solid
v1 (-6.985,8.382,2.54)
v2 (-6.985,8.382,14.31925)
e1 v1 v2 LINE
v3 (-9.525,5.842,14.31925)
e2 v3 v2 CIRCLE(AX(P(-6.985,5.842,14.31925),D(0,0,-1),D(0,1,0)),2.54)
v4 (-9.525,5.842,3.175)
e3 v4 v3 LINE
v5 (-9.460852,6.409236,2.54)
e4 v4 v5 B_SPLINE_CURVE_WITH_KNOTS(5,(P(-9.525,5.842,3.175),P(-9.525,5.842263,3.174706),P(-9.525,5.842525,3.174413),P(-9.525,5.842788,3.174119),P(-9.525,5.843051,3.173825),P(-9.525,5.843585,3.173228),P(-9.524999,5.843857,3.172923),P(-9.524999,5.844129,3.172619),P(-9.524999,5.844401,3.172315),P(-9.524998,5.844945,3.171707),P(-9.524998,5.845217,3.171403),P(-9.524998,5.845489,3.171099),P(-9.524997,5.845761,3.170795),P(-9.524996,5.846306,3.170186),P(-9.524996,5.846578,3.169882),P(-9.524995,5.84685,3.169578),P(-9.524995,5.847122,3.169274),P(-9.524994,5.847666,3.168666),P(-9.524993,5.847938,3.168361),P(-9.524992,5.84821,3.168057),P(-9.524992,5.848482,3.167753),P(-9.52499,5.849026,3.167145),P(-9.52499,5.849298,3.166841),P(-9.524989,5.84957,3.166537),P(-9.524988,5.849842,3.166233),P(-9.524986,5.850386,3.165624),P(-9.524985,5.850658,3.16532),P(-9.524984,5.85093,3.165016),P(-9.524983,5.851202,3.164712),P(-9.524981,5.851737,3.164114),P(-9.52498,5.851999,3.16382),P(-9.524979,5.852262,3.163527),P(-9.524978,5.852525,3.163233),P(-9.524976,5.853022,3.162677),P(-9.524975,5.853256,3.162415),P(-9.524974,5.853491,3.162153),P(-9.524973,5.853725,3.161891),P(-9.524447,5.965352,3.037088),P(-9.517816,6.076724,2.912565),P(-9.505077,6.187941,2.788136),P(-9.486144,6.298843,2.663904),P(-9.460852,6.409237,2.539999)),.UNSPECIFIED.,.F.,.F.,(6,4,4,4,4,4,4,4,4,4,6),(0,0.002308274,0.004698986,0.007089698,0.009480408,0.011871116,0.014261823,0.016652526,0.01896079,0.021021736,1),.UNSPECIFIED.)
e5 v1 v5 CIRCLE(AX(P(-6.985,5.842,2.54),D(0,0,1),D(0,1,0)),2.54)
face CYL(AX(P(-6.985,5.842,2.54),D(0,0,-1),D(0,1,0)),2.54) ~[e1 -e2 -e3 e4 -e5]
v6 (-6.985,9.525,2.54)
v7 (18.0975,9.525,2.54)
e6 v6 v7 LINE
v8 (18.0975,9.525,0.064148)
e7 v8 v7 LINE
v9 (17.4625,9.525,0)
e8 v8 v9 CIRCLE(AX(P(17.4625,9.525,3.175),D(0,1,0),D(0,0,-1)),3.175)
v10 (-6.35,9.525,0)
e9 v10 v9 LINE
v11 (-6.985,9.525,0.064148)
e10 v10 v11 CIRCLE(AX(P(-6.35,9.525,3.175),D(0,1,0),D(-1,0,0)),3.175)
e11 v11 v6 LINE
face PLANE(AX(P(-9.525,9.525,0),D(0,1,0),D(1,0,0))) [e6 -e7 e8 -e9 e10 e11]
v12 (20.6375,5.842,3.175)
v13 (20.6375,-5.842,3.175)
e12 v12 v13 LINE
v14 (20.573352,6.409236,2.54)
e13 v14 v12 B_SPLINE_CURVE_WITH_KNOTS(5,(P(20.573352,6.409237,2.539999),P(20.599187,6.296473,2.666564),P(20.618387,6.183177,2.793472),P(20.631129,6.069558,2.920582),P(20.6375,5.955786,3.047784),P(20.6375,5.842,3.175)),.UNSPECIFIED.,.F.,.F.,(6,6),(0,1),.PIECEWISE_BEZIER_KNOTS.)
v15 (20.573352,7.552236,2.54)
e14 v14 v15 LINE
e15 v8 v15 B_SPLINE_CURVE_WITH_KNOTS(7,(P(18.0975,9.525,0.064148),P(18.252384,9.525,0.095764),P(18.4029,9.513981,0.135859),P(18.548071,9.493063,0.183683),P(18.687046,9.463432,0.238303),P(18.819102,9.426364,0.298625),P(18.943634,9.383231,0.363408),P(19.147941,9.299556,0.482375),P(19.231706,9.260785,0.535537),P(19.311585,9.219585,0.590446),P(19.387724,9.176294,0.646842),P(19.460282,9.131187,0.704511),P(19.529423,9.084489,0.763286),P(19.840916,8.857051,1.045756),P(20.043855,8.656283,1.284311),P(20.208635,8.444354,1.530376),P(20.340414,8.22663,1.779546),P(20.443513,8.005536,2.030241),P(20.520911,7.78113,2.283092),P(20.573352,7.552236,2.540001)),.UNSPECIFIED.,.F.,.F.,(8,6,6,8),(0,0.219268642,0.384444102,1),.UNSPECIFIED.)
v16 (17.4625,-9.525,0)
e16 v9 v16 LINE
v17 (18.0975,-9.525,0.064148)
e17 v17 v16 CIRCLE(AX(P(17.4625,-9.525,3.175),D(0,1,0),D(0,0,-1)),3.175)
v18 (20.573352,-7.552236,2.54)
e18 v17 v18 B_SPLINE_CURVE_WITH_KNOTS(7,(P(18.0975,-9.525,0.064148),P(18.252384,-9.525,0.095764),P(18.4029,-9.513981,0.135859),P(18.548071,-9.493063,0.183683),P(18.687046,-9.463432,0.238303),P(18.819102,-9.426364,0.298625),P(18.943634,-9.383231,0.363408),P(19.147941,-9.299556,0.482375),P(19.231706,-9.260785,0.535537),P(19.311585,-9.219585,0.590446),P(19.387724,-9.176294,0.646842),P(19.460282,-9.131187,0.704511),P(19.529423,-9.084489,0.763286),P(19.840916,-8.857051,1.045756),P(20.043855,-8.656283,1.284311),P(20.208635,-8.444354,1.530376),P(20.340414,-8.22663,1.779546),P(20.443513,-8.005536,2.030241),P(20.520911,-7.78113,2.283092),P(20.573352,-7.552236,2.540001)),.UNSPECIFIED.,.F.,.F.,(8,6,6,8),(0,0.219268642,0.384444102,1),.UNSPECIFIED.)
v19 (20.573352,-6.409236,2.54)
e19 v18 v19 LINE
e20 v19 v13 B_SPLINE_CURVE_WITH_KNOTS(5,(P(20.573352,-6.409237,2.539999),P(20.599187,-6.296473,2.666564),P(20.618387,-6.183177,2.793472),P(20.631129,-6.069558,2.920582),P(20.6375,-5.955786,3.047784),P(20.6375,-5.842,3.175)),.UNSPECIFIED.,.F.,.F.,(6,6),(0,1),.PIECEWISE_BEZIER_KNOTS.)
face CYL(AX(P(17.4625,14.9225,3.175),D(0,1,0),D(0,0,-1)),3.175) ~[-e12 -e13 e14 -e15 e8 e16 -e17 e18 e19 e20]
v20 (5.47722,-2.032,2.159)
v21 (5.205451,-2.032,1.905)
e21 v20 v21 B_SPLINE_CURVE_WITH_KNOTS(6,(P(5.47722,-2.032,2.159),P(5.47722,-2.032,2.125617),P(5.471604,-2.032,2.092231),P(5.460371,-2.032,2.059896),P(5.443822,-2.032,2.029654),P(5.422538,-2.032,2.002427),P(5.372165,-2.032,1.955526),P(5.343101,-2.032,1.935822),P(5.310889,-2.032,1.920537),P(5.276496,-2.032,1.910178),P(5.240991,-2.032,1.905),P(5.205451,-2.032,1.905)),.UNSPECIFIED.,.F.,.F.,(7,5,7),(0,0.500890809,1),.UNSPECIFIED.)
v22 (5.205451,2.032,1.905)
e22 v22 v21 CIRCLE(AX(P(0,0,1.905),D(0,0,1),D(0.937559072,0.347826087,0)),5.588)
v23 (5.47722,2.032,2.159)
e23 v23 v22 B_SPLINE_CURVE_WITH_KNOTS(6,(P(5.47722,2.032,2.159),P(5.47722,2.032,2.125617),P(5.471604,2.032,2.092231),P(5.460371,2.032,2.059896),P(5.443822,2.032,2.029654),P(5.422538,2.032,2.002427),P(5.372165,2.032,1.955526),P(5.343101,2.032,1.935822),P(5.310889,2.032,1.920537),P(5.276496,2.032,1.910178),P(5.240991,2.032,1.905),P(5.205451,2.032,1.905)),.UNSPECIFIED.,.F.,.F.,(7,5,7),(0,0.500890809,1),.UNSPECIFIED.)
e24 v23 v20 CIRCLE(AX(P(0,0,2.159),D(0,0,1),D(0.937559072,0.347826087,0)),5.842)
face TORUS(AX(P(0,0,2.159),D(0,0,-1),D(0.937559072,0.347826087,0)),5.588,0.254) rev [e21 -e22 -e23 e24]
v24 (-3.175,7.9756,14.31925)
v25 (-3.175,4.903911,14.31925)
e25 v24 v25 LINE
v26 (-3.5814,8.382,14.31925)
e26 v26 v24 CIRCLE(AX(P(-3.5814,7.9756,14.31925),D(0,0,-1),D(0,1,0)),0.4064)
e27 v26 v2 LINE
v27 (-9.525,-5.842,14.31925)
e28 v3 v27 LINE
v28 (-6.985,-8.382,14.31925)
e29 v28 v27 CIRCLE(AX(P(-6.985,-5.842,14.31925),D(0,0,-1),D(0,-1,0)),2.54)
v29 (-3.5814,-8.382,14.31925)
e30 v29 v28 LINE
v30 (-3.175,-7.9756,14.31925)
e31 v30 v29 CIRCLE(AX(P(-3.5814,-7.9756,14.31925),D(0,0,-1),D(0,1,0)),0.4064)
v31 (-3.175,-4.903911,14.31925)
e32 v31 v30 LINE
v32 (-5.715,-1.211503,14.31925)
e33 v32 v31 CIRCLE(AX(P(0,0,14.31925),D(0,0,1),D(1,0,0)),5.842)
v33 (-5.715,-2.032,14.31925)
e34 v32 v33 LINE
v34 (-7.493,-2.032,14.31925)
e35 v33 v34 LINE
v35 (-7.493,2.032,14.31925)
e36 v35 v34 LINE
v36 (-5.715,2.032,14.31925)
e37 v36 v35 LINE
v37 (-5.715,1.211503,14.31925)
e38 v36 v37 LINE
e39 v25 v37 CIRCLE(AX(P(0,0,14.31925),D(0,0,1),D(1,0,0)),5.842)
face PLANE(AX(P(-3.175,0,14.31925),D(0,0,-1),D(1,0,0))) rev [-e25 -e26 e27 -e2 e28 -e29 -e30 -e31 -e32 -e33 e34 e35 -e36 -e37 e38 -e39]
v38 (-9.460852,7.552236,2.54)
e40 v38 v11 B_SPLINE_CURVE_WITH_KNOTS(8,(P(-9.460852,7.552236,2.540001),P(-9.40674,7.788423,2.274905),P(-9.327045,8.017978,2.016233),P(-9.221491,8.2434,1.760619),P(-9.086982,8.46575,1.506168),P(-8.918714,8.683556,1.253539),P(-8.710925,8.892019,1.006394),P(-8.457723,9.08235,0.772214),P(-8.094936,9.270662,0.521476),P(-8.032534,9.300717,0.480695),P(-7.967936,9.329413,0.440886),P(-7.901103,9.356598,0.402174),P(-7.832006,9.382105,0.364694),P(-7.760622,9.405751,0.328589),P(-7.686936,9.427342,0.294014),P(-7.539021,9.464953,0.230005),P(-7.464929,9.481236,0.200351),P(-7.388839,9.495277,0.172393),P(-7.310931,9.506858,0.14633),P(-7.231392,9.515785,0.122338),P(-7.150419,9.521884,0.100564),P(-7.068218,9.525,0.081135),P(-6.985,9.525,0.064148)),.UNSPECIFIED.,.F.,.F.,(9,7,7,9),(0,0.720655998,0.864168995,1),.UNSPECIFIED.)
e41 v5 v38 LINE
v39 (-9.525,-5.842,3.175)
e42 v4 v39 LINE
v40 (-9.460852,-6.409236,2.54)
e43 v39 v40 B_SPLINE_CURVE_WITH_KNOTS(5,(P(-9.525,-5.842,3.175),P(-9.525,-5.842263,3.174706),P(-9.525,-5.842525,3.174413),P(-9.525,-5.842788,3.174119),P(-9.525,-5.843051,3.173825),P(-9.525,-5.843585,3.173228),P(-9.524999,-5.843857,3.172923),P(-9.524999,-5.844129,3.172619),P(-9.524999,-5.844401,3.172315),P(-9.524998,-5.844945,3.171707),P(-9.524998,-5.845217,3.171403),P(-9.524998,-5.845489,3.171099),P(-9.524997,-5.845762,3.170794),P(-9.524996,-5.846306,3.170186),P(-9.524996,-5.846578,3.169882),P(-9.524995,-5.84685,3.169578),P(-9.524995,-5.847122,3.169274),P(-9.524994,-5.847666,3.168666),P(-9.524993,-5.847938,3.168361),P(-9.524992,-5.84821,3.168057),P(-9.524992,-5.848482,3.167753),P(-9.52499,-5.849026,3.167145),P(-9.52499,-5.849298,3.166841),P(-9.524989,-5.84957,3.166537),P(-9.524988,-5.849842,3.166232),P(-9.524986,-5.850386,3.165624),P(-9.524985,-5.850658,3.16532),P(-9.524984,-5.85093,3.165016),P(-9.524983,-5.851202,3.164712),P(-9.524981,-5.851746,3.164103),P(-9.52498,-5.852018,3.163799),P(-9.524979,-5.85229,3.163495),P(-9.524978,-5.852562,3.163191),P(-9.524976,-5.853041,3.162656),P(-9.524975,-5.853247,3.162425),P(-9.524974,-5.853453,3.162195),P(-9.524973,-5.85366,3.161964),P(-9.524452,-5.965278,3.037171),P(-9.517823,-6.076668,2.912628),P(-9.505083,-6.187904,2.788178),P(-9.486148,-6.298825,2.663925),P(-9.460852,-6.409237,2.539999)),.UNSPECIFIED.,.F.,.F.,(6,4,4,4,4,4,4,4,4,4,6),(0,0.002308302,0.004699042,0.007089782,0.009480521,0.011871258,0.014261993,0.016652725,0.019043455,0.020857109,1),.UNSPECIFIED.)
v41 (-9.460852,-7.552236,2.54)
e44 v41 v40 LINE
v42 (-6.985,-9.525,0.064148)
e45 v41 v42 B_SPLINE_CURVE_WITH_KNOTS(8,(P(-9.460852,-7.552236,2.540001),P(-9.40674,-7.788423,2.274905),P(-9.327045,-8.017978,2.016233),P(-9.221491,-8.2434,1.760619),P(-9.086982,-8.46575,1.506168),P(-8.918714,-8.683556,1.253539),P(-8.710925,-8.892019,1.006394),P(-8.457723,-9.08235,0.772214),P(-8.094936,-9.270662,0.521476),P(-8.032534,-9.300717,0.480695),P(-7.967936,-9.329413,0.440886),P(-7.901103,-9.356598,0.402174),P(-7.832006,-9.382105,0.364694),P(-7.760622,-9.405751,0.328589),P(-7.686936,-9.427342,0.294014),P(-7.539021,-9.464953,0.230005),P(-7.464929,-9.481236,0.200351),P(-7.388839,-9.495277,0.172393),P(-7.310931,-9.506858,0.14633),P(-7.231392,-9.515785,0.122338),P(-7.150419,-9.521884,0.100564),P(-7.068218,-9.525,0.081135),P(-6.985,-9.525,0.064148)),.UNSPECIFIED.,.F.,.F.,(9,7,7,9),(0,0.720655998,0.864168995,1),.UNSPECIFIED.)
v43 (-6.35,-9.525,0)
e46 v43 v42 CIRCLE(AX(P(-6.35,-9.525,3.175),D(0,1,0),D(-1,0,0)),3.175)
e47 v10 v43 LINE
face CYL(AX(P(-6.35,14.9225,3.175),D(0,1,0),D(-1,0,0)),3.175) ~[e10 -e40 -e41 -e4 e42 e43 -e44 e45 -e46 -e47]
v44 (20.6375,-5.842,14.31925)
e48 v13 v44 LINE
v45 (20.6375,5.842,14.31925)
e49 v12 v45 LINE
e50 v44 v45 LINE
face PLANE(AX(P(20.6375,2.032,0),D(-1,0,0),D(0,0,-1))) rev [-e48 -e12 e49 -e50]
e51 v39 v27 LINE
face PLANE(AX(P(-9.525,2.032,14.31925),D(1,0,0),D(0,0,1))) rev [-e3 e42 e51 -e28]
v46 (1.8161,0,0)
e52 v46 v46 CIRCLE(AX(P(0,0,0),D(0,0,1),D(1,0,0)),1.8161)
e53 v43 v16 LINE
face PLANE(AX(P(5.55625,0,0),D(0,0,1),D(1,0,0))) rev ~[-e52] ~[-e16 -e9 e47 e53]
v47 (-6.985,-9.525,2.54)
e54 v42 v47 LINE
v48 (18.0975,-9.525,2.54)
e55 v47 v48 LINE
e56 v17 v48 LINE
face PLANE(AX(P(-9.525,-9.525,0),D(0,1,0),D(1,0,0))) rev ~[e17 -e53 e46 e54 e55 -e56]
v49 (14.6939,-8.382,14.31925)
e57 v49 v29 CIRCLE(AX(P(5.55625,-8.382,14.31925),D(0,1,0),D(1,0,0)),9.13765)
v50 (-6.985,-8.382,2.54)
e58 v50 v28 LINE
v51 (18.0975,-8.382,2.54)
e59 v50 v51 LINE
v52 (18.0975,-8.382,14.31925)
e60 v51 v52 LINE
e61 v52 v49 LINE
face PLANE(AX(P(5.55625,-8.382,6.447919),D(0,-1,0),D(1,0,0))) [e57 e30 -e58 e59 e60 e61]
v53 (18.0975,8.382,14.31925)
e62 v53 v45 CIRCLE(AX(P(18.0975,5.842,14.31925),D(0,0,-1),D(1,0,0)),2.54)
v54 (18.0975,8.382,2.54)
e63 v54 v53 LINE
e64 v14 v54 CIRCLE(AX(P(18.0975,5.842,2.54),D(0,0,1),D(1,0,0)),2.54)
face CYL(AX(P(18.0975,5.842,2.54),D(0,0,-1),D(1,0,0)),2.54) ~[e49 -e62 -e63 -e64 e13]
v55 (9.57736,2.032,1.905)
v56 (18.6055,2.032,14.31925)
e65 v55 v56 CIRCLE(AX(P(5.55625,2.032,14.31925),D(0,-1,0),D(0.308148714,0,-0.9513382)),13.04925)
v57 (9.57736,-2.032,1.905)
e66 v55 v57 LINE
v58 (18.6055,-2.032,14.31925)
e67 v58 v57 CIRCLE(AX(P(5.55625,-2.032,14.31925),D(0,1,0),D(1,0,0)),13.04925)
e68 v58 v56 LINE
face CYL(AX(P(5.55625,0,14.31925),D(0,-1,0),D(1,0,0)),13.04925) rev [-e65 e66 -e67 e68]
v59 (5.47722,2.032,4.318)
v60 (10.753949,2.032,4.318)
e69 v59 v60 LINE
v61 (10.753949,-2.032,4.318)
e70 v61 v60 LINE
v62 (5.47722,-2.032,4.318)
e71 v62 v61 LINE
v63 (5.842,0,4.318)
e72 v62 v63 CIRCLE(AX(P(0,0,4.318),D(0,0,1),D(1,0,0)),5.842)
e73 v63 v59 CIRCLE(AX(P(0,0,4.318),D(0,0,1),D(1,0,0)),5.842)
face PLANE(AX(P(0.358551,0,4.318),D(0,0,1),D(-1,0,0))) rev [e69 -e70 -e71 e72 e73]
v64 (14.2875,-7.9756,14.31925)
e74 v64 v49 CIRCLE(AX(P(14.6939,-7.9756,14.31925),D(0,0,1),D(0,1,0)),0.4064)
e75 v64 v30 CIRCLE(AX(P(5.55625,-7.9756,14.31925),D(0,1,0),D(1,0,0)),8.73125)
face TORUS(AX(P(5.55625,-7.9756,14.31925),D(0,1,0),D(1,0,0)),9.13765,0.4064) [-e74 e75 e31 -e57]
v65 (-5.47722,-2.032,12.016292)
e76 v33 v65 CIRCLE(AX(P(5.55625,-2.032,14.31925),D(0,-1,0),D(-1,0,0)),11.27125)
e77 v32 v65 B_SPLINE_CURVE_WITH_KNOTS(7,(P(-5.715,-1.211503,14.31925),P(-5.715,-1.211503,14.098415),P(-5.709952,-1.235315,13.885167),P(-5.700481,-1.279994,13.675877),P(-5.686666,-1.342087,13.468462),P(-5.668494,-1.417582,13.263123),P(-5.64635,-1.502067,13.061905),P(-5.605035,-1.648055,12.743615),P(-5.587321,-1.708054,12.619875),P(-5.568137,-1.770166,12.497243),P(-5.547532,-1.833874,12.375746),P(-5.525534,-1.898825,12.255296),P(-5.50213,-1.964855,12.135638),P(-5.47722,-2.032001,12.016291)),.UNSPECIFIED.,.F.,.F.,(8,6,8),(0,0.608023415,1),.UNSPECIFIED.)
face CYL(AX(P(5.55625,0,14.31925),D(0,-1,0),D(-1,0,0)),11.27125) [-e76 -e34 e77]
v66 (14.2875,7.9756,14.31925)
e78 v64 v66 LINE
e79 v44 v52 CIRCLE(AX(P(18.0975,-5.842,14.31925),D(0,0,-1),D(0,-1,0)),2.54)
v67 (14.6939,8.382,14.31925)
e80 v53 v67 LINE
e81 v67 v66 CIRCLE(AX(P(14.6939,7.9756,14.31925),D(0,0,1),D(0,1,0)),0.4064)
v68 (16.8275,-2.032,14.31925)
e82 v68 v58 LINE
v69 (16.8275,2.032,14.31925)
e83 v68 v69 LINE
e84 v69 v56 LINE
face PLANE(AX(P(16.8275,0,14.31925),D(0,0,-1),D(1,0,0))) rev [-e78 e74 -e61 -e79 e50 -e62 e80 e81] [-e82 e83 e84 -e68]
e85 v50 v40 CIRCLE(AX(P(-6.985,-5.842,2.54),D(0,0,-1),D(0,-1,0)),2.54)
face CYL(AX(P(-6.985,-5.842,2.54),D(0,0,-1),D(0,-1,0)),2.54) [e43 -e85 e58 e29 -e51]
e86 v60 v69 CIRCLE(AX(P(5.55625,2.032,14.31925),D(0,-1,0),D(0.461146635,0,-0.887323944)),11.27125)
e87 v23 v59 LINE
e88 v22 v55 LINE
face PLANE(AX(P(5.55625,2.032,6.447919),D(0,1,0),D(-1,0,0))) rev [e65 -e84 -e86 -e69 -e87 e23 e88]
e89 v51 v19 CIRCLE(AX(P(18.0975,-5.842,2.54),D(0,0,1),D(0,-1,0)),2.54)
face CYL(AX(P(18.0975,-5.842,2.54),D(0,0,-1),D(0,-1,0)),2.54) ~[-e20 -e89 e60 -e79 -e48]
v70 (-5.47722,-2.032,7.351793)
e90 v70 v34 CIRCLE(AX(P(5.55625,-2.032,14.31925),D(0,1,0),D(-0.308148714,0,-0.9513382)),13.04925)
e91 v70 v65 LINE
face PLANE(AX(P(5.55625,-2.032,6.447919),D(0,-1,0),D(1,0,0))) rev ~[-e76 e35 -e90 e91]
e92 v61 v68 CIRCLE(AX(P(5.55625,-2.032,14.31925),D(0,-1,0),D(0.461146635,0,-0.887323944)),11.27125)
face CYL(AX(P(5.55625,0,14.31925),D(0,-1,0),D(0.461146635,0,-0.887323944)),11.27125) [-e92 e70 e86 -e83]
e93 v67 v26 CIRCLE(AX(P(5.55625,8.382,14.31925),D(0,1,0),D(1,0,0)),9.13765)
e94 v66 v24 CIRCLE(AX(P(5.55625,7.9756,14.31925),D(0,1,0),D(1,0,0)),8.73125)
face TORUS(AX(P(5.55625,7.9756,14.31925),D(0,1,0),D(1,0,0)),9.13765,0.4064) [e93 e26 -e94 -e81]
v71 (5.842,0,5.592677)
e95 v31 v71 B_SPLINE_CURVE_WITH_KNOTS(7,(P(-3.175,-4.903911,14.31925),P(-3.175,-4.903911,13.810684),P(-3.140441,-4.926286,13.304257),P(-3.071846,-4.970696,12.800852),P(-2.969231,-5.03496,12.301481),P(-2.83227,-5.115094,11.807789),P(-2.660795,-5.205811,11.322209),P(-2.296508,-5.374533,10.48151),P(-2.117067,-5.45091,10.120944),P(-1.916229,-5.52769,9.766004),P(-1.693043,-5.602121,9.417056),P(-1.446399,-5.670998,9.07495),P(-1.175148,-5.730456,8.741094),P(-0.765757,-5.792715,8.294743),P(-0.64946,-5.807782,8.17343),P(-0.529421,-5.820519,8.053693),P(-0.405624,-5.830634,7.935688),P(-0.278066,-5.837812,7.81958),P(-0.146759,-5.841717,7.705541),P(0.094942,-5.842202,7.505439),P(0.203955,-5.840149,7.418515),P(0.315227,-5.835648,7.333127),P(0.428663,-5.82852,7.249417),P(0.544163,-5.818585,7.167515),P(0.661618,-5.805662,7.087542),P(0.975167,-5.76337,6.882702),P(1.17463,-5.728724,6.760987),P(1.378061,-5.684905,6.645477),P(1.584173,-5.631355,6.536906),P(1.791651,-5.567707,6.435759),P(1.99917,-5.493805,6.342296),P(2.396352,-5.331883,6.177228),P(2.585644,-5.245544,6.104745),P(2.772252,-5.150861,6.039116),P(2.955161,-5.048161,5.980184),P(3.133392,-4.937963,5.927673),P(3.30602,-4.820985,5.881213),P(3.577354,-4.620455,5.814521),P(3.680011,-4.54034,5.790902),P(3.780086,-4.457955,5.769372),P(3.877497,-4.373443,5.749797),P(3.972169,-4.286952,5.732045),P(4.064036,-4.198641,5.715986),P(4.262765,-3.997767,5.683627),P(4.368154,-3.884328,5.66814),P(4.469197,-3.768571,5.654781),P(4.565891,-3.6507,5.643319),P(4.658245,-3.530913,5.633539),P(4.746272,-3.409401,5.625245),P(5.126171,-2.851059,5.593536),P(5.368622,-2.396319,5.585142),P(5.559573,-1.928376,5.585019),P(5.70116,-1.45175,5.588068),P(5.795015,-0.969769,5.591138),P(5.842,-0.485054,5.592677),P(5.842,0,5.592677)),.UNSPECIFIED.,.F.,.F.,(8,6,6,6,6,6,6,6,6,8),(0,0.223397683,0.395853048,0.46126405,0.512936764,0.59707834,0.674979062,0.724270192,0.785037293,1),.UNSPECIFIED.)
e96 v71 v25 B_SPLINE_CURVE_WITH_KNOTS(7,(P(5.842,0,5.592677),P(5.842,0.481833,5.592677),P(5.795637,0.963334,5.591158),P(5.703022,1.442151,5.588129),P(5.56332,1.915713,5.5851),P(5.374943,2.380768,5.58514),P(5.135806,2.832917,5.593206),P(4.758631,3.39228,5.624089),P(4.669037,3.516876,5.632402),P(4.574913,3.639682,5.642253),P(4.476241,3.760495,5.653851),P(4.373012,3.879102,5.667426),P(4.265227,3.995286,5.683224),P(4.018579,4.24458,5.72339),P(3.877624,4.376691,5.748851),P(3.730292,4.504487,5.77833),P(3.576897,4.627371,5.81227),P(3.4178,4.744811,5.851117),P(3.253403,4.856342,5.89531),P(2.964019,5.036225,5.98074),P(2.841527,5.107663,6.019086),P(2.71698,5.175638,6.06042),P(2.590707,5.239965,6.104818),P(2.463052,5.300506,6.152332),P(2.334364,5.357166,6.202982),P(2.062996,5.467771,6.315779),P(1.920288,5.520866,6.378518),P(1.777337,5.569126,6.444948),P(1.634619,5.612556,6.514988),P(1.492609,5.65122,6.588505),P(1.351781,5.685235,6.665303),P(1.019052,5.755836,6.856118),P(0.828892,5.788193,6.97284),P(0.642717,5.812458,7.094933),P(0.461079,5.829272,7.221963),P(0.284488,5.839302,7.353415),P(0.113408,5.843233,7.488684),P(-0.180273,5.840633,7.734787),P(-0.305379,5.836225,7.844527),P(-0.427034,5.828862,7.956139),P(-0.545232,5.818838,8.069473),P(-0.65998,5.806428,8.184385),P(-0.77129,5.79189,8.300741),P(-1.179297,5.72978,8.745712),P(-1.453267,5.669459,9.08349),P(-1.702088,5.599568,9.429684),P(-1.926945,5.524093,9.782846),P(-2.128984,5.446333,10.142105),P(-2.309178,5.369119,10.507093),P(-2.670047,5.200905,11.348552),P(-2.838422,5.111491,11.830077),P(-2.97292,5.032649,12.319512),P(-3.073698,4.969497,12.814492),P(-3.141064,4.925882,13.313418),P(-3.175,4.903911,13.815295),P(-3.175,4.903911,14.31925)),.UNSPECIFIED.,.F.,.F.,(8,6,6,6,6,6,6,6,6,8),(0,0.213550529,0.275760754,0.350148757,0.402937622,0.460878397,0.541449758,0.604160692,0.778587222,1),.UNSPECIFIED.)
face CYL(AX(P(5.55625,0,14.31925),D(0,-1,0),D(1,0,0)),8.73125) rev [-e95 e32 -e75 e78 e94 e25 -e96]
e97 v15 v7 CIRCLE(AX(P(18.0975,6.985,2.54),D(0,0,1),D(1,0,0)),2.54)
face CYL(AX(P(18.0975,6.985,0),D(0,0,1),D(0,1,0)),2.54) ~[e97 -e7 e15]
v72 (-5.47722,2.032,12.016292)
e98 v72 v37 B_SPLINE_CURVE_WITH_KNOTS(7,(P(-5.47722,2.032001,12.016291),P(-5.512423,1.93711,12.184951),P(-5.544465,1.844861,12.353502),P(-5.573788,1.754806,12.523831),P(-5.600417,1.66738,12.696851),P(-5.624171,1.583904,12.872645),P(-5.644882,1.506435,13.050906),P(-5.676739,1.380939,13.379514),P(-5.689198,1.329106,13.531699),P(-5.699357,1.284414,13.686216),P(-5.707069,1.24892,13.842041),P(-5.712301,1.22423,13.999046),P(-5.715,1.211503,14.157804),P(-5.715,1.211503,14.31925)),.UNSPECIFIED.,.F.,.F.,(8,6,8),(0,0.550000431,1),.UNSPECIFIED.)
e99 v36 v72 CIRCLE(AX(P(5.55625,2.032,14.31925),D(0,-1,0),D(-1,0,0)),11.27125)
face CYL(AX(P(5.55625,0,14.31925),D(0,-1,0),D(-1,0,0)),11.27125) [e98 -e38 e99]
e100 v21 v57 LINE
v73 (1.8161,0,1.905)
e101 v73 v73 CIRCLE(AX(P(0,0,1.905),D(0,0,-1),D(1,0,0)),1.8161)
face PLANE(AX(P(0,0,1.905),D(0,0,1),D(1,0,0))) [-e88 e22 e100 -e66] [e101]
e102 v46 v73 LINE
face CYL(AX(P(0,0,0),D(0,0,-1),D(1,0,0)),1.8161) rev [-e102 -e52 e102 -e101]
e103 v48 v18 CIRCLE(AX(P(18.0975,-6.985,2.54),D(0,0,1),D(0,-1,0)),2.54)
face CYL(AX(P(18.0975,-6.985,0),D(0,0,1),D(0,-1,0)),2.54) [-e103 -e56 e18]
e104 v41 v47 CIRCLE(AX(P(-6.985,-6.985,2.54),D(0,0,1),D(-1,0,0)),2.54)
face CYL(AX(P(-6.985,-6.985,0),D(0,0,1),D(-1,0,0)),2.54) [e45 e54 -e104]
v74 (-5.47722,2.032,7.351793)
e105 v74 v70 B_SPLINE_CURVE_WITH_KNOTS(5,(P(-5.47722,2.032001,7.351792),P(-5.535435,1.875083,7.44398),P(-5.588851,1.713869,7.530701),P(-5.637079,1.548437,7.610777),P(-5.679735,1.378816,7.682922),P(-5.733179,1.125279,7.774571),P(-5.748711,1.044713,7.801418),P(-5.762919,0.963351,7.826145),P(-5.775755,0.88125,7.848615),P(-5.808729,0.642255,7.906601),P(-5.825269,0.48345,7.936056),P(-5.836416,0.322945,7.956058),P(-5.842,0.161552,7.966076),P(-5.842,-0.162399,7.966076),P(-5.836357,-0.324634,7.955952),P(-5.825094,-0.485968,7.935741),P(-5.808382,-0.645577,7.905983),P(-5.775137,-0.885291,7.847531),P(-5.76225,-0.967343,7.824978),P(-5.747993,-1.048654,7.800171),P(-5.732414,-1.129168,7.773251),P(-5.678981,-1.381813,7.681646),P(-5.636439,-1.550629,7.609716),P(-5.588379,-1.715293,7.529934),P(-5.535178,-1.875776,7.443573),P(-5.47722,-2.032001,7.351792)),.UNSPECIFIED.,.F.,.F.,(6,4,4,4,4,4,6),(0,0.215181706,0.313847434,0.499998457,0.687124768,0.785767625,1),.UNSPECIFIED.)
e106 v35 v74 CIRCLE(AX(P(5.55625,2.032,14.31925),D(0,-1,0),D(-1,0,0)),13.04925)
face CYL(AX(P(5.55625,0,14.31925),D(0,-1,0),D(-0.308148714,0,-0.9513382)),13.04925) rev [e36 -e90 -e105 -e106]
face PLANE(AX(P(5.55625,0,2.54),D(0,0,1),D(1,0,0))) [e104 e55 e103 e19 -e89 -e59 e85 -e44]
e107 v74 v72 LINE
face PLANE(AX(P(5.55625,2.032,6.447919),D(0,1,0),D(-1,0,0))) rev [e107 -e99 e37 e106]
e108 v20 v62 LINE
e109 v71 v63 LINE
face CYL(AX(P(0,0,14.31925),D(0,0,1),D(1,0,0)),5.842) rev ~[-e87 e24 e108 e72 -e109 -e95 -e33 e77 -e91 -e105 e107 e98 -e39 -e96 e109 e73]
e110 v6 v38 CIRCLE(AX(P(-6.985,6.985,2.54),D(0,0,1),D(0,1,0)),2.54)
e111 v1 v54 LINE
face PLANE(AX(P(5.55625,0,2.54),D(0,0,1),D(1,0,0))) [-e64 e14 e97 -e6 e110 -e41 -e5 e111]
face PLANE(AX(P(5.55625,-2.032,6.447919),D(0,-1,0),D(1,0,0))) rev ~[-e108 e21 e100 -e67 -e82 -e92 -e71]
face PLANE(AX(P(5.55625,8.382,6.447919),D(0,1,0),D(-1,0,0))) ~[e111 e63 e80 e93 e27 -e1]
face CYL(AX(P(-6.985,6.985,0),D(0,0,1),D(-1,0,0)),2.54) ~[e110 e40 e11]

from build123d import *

# Parameters (mm, degrees)
F2_W         = 30.1625
F2_H         = 19.05
F2_R         = 5.842
F2_R_2       = 1.8161
F3_DEPTH     = 2.54
F5_DEPTH     = 2.032
F7_DEPTH     = 6.35
F8_DEPTH     = 2.032
F9_DEPTH     = 2.032
F11_DEPTH    = 14.32025
F12_R        = 5.842
F13_DEPTH    = 12.41425
F14_R        = 2.54
F15_R        = 0.4064
F16_R        = 0.254
F17_T1_DEPTH = 18.2149387894
F18_T1_DEPTH = 29.845


# Not quite as in the source:
# - a fillet or chamfer that OpenCascade refuses, or shapes differently, is made with other operations: its cross-section is extruded or revolved along the edge and cut away or added


with BuildPart() as f3:
    # F2 (on Top) → F3 (new body)
    with BuildSketch(Plane.XY):
        with Locations((5.55625, 0)):
            Rectangle(F2_W, F2_H)
        Circle(F2_R, mode=Mode.SUBTRACT)
        Circle(F2_R)
        Circle(F2_R_2, mode=Mode.SUBTRACT)
    extrude(amount=F3_DEPTH)

    # F4 (on Front) → F5 (join, symmetric)
    with BuildSketch(Plane.XZ):
        with BuildLine():
            ThreePointArc((1.5351403895, 1.905), (-4.9973131459, 6.6442757011), (-7.493, 14.31925))
            Line((-7.493, 14.31925), (-9.525, 14.31925))
            Line((-9.525, 14.31925), (-9.525, 0))
            Line((-9.525, 0), (20.6375, 0))
            Line((20.6375, 0), (20.6375, 14.31925))
            Line((20.6375, 14.31925), (18.6055, 14.31925))
            ThreePointArc((18.6055, 14.31925), (16.1098131459, 6.6442757011), (9.5773596105, 1.905))
            Line((9.5773596105, 1.905), (1.5351403895, 1.905))
        make_face()
    extrude(amount=F5_DEPTH, both=True)

    # F6 (on face) → F7 (join)
    with BuildSketch(Plane.XZ.offset(2.032)):
        with BuildLine():
            Line((-3.175, 14.31925), (-9.525, 14.31925))
            Line((-9.525, 14.31925), (-9.525, 0))
            Line((-9.525, 0), (20.6375, 0))
            Line((20.6375, 0), (20.6375, 14.31925))
            Line((20.6375, 14.31925), (14.2875, 14.31925))
            ThreePointArc((14.2875, 14.31925), (5.55625, 5.588), (-3.175, 14.31925))
        make_face()
    extrude(amount=F7_DEPTH)

    # F4 (on Front) → F8 (cut, symmetric)
    with BuildSketch(Plane.XZ):
        with BuildLine():
            ThreePointArc((0.3585509899, 4.318), (-4.0776910817, 8.4687580722), (-5.715, 14.31925))
            Line((-5.715, 14.31925), (-7.493, 14.31925))
            ThreePointArc((-7.493, 14.31925), (-4.9973131459, 6.6442757011), (1.5351403895, 1.905))
            Line((1.5351403895, 1.905), (9.5773596105, 1.905))
            ThreePointArc((9.5773596105, 1.905), (16.1098131459, 6.6442757011), (18.6055, 14.31925))
            Line((18.6055, 14.31925), (16.8275, 14.31925))
            ThreePointArc((16.8275, 14.31925), (15.1901910817, 8.4687580722), (10.7539490101, 4.318))
            Line((10.7539490101, 4.318), (0.3585509899, 4.318))
        make_face()
    extrude(amount=F8_DEPTH, both=True, mode=Mode.SUBTRACT)

    # F4 (on Front) → F9 (join, through all)
    with BuildSketch(Plane.XZ):
        with BuildLine():
            ThreePointArc((14.2875, 14.31925), (5.55625, 5.588), (-3.175, 14.31925))
            Line((-3.175, 14.31925), (-5.715, 14.31925))
            ThreePointArc((-5.715, 14.31925), (-4.0776910817, 8.4687580722), (0.3585509899, 4.318))
            Line((0.3585509899, 4.318), (10.7539490101, 4.318))
            ThreePointArc((10.7539490101, 4.318), (15.1901910817, 8.4687580722), (16.8275, 14.31925))
            Line((16.8275, 14.31925), (14.2875, 14.31925))
        make_face()
    extrude(amount=F9_DEPTH)

    # F10: F3 across plane


with BuildPart() as f3_1:
    add(f3.part)
    add(f3.part.mirror(Plane.XZ))

    # F2 (on Top) → F11 (cut, through all)
    with BuildSketch(Plane.XY):
        Circle(F2_R_2)
    extrude(amount=F11_DEPTH, mode=Mode.SUBTRACT)

    # F12 (on face) → F13 (cut, through all)
    with BuildSketch(Plane.XY.offset(14.31925)):
        Circle(F12_R)
    extrude(amount=-F13_DEPTH, mode=Mode.SUBTRACT)

    # F14
    f14_edges = [f3_1.edges().sort_by_distance(p)[0] for p in [
        (20.6375, 9.525, 1.27),
        (-9.525, 9.525, 1.27),
        (20.6375, -9.525, 1.27),
        (-9.525, -9.525, 1.27),
    ]]
    fillet(f14_edges, radius=F14_R)

    # F15
    f15_edges = [f3_1.edges().sort_by_distance(p)[0] for p in [
        (5.55625, -8.382, 5.588),
        (5.55625, 8.382, 5.588),
    ]]
    fillet(f15_edges, radius=F15_R)

    # F16
    f16_edges = [f3_1.edges().sort_by_distance(p)[0] for p in [
        (-5.842, 0, 1.905),
    ]]
    fillet(f16_edges, radius=F16_R)

    # F17: fillet of radius 2.54 on 4 edges, made by hand

    # F17_s2 → F17_t1 (cut)
    with BuildSketch(Plane.XY.offset(2.54)):
        with BuildLine():
            ThreePointArc((-6.985, -8.382), (-8.7810512242, -7.6380512242), (-9.525, -5.842))
            Line((-9.525, -5.842), (-9.779, -5.842))
            ThreePointArc((-9.779, -5.842), (-9.779, -6.985), (-9.3184500445, -8.5217))
            Line((-9.3184500445, -8.5217), (-9.1063182222, -8.636))
            Line((-9.1063182222, -8.636), (-6.985, -8.636))
            Line((-6.985, -8.636), (-6.985, -8.382))
        make_face()
        with BuildLine():
            ThreePointArc((18.0975, -8.382), (19.8935512242, -7.6380512242), (20.6375, -5.842))
            Line((20.6375, -5.842), (20.8915, -5.842))
            ThreePointArc((20.8915, -5.842), (20.8915, -6.985), (20.4309500445, -8.5217))
            Line((20.4309500445, -8.5217), (20.2188182222, -8.636))
            Line((20.2188182222, -8.636), (18.0975, -8.636))
            Line((18.0975, -8.636), (18.0975, -8.382))
        make_face()
        with BuildLine():
            ThreePointArc((20.6375, 5.842), (19.8935512242, 7.6380512242), (18.0975, 8.382))
            Line((18.0975, 8.382), (18.0975, 8.636))
            Line((18.0975, 8.636), (20.2188182222, 8.636))
            Line((20.2188182222, 8.636), (20.4309500445, 8.5217))
            ThreePointArc((20.4309500445, 8.5217), (20.8915, 6.985), (20.8915, 5.842))
            Line((20.8915, 5.842), (20.6375, 5.842))
        make_face()
        with BuildLine():
            ThreePointArc((-6.985, 8.382), (-8.7810512242, 7.6380512242), (-9.525, 5.842))
            Line((-9.525, 5.842), (-9.779, 5.842))
            ThreePointArc((-9.779, 5.842), (-9.779, 6.985), (-9.3184500445, 8.5217))
            Line((-9.3184500445, 8.5217), (-9.1063182222, 8.636))
            Line((-9.1063182222, 8.636), (-6.985, 8.636))
            Line((-6.985, 8.636), (-6.985, 8.382))
        make_face()
    extrude(amount=F17_T1_DEPTH, mode=Mode.SUBTRACT)

    # F18: fillet of radius 3.175 on 2 edges, made by hand

    # F18_s2 → F18_t1 (cut)
    with BuildSketch(Plane.XZ.offset(-14.9225)):
        with BuildLine():
            ThreePointArc((17.4625, 0), (19.7075640303, 0.9299359697), (20.6375, 3.175))
            Line((20.6375, 3.175), (20.6375, 0))
            Line((20.6375, 0), (17.4625, 0))
        make_face()
        with BuildLine():
            ThreePointArc((-9.525, 3.175), (-8.5950640303, 0.9299359697), (-6.35, 0))
            Line((-6.35, 0), (-9.525, 0))
            Line((-9.525, 0), (-9.525, 3.175))
        make_face()
    extrude(amount=F18_T1_DEPTH, mode=Mode.SUBTRACT)


solid = f3_1.part
